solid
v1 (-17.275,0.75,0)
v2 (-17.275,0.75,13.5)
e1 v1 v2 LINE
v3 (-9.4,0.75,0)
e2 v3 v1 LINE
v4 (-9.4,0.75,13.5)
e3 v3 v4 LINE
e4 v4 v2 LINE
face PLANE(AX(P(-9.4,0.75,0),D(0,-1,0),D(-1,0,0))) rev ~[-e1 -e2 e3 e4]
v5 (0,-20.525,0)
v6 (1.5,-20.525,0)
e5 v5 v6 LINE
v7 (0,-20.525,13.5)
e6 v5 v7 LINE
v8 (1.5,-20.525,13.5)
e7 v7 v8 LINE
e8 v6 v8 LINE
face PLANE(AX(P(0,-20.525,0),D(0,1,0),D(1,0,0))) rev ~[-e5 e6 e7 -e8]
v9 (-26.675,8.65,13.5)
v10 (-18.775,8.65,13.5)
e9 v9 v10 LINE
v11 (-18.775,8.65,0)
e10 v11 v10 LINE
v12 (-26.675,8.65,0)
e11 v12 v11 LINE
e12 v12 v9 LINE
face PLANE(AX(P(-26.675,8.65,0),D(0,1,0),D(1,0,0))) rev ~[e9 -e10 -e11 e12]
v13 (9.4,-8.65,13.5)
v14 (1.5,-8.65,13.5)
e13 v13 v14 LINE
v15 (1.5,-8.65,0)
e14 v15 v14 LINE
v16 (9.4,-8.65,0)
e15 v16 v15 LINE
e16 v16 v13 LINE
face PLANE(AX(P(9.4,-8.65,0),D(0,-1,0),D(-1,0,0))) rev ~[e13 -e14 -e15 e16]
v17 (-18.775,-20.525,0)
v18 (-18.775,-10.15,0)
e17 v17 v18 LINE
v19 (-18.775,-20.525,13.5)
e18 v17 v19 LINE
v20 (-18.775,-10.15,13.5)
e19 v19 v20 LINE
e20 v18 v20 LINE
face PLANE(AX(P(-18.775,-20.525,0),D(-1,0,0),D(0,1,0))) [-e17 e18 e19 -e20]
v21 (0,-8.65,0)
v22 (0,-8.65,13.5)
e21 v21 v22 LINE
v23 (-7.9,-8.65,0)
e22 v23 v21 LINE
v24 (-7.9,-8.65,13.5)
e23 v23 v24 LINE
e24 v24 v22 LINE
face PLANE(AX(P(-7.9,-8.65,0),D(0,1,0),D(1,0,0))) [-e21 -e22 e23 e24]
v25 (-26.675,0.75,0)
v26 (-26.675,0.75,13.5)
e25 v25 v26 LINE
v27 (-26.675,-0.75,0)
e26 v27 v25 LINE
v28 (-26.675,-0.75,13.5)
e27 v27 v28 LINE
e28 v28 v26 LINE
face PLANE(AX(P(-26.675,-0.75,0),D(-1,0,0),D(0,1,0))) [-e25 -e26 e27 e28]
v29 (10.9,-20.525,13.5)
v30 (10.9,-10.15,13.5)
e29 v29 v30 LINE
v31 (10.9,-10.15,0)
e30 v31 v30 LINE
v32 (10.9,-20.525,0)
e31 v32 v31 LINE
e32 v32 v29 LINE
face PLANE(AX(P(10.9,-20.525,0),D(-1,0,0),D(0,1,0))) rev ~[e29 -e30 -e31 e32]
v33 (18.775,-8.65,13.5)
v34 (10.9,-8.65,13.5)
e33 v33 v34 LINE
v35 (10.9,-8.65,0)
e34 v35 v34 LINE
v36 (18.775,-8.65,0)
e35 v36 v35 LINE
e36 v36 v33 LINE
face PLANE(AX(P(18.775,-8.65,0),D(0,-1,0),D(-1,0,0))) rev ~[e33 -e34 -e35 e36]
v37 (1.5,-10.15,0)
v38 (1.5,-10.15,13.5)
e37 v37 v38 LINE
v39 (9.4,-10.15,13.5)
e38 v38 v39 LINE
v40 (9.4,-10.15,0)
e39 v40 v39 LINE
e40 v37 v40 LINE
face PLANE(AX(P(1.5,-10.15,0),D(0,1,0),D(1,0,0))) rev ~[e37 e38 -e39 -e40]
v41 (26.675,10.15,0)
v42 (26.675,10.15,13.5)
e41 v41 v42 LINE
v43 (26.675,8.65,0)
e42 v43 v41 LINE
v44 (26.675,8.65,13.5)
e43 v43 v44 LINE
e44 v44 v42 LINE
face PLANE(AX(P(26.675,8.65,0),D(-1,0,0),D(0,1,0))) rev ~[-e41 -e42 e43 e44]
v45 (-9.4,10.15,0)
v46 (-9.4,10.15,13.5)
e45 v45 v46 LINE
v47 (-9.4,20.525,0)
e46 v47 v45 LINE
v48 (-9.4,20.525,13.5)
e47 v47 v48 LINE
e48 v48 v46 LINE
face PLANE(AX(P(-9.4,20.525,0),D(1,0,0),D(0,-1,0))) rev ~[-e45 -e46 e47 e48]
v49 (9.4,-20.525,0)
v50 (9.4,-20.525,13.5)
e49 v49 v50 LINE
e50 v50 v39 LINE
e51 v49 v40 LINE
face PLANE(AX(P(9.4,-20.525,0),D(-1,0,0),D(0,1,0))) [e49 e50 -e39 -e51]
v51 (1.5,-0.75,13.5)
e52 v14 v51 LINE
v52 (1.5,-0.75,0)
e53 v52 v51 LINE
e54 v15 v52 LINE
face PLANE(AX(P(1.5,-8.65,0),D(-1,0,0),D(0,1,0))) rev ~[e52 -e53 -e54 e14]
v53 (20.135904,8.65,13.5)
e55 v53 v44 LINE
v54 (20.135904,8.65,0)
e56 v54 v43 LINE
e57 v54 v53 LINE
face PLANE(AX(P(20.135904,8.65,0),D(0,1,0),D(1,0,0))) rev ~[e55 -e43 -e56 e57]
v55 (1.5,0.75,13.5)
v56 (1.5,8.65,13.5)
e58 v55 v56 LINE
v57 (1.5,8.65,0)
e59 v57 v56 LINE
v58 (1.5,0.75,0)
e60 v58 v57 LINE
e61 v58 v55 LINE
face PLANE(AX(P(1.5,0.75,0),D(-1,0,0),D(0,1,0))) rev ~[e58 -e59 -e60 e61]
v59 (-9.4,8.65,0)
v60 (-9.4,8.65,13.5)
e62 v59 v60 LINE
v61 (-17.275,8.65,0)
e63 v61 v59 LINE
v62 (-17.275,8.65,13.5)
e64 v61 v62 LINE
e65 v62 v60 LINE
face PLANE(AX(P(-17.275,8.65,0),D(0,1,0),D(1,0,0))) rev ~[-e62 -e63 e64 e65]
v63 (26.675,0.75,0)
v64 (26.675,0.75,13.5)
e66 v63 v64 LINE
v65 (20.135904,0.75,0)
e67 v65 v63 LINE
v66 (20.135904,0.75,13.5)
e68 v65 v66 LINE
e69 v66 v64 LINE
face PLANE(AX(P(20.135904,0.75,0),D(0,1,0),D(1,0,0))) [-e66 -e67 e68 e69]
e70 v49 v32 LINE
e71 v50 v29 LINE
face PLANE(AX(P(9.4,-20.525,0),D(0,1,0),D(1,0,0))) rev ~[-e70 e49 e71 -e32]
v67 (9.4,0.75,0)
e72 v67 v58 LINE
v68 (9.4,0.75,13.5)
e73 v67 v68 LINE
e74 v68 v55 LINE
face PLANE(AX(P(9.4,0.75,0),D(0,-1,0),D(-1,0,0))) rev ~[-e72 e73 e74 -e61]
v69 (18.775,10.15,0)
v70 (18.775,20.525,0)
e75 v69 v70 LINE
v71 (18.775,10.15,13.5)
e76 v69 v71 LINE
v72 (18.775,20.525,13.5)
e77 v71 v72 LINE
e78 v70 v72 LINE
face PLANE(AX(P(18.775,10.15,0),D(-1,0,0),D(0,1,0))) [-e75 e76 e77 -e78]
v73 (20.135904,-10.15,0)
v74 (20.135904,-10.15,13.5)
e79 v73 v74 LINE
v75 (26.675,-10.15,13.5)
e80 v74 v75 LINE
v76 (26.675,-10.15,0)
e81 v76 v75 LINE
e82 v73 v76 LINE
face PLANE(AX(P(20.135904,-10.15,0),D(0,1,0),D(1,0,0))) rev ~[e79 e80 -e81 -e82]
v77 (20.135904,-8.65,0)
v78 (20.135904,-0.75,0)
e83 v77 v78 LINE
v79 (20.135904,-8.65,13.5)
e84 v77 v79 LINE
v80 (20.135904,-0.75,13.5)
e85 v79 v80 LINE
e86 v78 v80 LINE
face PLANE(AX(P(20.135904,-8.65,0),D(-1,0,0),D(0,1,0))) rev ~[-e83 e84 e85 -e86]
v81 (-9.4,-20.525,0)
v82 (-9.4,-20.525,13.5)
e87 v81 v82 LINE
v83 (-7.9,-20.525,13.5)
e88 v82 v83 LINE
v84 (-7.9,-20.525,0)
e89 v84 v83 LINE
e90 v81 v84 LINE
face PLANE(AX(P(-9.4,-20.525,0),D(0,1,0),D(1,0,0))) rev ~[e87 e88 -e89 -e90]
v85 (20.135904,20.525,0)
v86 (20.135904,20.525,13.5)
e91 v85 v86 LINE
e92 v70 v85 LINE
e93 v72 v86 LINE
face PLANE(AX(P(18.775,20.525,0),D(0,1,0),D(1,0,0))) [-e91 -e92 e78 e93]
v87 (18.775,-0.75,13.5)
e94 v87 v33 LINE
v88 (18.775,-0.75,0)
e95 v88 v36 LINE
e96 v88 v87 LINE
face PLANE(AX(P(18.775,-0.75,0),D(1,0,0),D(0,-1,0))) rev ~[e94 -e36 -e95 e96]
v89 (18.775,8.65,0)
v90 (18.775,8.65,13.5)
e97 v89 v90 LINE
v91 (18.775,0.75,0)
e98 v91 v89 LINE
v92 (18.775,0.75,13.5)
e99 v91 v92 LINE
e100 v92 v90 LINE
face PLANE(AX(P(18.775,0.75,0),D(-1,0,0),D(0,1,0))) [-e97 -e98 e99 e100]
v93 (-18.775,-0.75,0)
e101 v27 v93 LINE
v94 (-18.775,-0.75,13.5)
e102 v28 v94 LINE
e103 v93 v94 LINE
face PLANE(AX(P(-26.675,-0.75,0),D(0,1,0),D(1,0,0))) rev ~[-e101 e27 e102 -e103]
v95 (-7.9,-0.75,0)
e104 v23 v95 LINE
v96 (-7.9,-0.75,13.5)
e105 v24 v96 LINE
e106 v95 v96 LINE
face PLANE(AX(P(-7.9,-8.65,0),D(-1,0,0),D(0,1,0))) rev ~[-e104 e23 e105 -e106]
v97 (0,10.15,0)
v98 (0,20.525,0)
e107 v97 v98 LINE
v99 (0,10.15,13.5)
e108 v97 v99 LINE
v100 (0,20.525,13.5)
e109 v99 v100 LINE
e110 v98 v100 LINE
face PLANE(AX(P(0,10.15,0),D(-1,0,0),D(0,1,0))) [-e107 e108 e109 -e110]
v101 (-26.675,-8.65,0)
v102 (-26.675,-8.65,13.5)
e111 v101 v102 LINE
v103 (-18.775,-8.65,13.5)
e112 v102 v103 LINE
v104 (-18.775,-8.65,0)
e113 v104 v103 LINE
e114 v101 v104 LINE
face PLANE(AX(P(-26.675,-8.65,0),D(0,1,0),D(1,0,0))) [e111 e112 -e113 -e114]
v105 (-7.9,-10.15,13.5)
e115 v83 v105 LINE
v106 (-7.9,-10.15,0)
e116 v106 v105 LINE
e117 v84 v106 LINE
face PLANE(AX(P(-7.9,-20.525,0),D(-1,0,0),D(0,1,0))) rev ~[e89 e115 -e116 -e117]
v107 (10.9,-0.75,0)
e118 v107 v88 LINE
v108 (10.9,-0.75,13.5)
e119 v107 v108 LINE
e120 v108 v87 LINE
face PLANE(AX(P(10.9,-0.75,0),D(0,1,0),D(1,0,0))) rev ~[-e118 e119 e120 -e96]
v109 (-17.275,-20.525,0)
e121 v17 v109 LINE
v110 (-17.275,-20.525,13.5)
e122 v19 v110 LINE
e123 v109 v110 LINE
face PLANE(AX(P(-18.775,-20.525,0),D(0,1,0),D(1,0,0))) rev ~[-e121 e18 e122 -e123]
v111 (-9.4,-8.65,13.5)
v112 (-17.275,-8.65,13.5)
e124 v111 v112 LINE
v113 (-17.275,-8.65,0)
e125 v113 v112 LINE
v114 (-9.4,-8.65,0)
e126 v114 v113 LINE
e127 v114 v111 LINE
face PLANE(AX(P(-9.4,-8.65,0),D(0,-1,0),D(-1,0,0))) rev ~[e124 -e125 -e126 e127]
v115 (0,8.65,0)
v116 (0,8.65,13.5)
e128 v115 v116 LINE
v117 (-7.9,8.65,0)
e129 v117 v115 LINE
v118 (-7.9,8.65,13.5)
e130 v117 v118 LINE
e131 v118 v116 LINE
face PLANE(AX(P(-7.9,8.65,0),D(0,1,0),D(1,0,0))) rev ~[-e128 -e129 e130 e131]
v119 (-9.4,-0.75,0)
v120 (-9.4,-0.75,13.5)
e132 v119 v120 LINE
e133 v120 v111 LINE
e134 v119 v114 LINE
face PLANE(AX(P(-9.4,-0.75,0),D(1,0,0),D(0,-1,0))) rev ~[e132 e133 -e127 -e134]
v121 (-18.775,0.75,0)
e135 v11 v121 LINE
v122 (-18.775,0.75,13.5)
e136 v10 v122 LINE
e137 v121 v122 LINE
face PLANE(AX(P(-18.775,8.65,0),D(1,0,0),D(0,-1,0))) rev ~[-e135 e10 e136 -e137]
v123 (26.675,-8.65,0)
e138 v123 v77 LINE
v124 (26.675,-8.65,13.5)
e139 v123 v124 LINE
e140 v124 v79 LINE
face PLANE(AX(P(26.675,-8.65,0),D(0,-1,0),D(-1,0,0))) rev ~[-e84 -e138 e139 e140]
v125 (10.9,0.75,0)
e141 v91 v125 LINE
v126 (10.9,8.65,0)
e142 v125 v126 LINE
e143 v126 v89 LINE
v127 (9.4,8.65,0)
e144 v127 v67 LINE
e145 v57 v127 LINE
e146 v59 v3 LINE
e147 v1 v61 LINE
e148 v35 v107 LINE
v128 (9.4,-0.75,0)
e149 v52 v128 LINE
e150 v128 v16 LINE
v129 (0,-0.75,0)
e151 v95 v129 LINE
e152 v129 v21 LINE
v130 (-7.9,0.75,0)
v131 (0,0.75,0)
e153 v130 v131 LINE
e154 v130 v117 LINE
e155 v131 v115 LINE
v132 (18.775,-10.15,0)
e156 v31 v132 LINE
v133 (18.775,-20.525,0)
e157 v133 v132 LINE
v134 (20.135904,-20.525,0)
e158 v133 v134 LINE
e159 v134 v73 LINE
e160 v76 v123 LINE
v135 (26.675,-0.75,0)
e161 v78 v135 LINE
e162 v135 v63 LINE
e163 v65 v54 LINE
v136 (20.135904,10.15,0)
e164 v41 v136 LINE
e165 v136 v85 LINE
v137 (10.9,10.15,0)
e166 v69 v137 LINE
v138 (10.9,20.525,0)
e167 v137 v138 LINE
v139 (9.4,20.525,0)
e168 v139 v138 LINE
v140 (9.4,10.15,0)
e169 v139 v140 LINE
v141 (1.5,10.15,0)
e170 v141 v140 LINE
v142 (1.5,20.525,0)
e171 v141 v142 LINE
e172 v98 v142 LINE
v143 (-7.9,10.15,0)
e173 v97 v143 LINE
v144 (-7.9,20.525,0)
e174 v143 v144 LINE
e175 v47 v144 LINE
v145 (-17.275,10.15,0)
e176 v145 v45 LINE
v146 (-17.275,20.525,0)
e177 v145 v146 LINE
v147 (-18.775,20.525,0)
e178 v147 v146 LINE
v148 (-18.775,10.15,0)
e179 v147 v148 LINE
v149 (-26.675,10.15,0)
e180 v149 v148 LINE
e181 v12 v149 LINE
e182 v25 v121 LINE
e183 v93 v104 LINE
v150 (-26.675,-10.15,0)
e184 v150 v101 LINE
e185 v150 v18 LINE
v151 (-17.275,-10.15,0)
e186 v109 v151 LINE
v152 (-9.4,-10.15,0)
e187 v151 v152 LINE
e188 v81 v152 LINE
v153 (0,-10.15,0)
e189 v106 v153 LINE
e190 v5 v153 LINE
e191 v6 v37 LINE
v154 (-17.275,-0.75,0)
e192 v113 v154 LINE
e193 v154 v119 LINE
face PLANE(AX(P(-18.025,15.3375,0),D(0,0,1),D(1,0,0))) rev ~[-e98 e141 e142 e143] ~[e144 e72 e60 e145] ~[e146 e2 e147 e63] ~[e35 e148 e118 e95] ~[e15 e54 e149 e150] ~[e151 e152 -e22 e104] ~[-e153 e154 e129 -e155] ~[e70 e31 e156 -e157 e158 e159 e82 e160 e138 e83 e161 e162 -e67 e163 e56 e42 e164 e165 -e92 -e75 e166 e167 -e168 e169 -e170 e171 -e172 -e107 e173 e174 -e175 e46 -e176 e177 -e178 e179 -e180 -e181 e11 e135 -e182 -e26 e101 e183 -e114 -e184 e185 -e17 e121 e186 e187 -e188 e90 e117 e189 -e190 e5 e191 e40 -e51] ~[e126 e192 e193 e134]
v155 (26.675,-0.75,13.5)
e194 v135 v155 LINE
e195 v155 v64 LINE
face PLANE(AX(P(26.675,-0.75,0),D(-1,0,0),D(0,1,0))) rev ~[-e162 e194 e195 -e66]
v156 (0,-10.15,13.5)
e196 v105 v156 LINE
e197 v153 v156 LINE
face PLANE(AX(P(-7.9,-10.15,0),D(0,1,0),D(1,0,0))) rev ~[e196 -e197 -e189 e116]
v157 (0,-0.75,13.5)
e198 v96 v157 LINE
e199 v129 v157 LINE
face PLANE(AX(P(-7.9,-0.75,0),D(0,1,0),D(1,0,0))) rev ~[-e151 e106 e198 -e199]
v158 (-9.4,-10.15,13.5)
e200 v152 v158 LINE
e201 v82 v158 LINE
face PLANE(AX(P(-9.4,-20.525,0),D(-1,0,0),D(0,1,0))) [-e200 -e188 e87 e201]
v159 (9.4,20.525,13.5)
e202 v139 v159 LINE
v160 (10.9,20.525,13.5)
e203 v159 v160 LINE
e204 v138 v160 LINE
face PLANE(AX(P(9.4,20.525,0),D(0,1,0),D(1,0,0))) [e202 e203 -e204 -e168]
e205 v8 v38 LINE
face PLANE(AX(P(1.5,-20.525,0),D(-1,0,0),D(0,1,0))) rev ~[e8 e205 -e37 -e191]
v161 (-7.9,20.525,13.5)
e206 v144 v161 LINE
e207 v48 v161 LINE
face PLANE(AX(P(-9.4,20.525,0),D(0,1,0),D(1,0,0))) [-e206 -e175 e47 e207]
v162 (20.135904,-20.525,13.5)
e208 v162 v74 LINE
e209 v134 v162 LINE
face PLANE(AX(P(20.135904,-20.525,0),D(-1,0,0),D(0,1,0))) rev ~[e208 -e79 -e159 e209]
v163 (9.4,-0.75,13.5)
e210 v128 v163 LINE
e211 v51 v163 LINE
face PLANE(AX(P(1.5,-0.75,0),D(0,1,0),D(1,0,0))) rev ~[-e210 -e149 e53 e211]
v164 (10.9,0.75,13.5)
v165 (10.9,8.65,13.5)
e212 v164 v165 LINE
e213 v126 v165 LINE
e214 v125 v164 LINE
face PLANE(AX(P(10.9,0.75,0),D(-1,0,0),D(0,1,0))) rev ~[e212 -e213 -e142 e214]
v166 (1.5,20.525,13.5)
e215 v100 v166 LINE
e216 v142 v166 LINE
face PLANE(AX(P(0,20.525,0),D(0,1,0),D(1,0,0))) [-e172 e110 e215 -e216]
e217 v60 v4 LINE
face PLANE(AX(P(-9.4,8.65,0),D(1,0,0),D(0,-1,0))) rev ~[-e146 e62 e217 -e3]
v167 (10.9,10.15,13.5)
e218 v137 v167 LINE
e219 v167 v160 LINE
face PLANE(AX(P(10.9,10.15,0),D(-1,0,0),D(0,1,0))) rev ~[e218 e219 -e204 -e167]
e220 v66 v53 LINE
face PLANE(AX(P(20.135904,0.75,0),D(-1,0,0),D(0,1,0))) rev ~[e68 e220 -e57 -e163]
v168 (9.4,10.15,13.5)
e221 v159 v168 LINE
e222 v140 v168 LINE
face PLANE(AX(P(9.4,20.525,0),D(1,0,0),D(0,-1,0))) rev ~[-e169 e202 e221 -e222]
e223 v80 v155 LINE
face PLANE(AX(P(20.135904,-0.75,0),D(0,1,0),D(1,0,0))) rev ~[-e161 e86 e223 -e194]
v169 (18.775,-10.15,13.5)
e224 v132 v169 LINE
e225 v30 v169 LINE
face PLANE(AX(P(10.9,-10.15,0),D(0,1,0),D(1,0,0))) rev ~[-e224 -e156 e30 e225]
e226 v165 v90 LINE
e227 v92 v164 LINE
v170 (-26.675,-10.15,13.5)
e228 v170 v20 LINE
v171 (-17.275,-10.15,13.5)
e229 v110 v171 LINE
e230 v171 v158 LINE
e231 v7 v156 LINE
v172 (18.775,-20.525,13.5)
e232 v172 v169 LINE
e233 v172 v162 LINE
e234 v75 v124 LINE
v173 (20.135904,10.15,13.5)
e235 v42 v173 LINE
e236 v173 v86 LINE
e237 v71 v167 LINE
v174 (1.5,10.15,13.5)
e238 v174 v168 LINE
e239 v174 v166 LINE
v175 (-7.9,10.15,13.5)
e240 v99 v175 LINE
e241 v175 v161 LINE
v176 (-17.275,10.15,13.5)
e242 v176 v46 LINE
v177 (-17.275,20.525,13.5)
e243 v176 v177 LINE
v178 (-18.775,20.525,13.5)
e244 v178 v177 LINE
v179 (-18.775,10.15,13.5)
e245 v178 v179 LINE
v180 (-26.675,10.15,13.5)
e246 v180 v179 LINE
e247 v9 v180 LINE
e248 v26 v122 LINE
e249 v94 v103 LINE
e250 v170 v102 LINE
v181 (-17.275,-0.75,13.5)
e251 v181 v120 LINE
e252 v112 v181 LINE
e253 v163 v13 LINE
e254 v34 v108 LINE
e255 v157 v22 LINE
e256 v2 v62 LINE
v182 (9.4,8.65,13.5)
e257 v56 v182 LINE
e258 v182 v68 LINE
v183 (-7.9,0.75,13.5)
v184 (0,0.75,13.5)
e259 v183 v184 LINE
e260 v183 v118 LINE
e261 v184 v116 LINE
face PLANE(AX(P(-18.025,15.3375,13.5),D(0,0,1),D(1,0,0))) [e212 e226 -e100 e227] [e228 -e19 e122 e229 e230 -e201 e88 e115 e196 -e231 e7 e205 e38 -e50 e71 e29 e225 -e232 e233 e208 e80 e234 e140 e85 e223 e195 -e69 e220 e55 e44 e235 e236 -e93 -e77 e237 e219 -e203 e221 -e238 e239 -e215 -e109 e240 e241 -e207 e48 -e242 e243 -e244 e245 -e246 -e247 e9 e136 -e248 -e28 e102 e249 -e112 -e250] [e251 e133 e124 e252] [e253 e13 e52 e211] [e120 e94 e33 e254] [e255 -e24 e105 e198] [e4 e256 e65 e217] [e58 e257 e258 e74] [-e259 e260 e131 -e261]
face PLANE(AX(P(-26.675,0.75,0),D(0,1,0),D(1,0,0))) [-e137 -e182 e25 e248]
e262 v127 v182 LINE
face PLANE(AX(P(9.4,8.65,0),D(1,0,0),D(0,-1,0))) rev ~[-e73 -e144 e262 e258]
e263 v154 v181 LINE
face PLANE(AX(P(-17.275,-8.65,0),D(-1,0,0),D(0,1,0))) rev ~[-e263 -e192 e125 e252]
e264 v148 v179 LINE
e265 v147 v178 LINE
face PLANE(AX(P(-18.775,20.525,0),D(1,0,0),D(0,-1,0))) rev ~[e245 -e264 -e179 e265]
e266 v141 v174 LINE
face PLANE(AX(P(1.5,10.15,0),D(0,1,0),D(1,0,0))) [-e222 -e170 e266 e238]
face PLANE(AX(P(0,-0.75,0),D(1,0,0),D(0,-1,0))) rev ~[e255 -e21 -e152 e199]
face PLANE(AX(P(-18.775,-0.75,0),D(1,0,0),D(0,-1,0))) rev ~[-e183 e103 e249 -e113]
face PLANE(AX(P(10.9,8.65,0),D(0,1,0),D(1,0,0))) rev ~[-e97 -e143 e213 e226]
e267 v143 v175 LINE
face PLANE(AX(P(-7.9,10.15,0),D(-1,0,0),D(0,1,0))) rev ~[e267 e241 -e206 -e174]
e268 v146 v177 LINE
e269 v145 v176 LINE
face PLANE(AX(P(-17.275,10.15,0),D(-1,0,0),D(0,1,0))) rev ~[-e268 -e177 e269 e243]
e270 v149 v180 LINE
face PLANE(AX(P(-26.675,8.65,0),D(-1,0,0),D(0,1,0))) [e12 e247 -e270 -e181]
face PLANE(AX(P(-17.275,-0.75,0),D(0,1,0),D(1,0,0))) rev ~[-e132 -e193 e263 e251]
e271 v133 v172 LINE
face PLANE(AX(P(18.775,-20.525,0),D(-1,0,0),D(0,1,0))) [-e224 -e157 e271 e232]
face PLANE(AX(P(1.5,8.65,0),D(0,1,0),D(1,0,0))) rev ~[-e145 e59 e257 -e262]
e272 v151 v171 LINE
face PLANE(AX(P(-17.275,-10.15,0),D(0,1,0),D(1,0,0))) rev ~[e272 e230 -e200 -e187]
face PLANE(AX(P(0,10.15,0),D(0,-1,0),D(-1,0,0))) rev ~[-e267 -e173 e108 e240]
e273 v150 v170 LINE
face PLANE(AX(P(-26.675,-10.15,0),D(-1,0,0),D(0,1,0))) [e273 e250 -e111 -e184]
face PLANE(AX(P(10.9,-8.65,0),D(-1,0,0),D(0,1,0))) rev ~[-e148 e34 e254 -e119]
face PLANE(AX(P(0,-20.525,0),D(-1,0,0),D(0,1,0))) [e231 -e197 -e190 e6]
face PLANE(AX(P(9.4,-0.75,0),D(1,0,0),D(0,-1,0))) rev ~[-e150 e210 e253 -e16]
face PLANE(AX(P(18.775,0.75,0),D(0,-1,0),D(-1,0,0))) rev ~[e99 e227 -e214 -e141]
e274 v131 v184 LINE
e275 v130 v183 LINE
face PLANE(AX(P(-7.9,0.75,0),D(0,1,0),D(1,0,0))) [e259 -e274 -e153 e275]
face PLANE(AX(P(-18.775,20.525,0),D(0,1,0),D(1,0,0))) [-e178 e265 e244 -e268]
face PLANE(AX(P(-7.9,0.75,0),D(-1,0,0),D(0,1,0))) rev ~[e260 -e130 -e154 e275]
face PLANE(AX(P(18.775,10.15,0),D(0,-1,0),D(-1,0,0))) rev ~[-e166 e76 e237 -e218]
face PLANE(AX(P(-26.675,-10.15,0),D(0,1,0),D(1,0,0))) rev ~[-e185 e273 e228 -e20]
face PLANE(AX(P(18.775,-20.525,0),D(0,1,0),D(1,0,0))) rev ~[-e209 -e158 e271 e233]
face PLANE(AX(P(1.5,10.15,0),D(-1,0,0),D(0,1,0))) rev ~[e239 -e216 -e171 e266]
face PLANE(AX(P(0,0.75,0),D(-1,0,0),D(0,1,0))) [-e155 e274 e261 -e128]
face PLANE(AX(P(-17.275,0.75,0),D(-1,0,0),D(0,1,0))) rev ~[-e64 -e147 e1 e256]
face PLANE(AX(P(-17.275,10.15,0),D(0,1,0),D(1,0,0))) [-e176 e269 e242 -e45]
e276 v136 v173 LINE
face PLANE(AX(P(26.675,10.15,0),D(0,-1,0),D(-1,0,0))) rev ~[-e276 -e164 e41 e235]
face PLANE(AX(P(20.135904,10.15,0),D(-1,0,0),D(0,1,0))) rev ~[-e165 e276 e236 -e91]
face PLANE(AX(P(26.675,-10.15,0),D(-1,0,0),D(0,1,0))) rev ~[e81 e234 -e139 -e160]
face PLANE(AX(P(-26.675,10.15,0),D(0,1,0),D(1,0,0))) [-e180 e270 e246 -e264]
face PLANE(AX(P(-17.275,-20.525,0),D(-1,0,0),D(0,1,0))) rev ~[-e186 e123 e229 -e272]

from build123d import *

# Parameters (mm, degrees)
F0_W     = 1.5
F0_H     = 10.375
F0_H_2   = 1.5
F0_W_2   = 7.9
F0_H_3   = 7.9
F0_W_3   = 7.875
F0_W_4   = 1.360903731
F0_W_5   = 6.539096269
F1_DEPTH = 13.5


with BuildPart() as f1:
    # F0 (on Top) → F1 (new body)
    with BuildSketch(Plane.XY):
        with Locations((-18.025, 15.3375)):
            Rectangle(F0_W, F0_H)
        with Locations((-18.025, 9.4)):
            Rectangle(F0_W, F0_H_2)
        with Locations((-22.725, 9.4)):
            Rectangle(F0_W_2, F0_H_2)
        with Locations((-18.025, 4.7)):
            Rectangle(F0_W, F0_H_3)
        with Locations((-18.025, 0)):
            Rectangle(F0_W, F0_H_2)
        with Locations((-22.725, 0)):
            Rectangle(F0_W_2, F0_H_2)
        with Locations((-18.025, -4.7)):
            Rectangle(F0_W, F0_H_3)
        with Locations((-18.025, -9.4)):
            Rectangle(F0_W, F0_H_2)
        with Locations((-22.725, -9.4)):
            Rectangle(F0_W_2, F0_H_2)
        with Locations((-18.025, -15.3375)):
            Rectangle(F0_W, F0_H)
        with Locations((-13.3375, -9.4)):
            Rectangle(F0_W_3, F0_H_2)
        with Locations((-8.65, -9.4)):
            Rectangle(F0_W, F0_H_2)
        with Locations((-8.65, -4.7)):
            Rectangle(F0_W, F0_H_3)
        with Locations((-8.65, 0)):
            Rectangle(F0_W, F0_H_2)
        with Locations((-13.3375, 0)):
            Rectangle(F0_W_3, F0_H_2)
        with Locations((-8.65, -15.3375)):
            Rectangle(F0_W, F0_H)
        with Locations((-8.65, 15.3375)):
            Rectangle(F0_W, F0_H)
        with Locations((-8.65, 9.4)):
            Rectangle(F0_W, F0_H_2)
        with Locations((-8.65, 4.7)):
            Rectangle(F0_W, F0_H_3)
        with Locations((-13.3375, 9.4)):
            Rectangle(F0_W_3, F0_H_2)
        with Locations((-3.95, 9.4)):
            Rectangle(F0_W_2, F0_H_2)
        with Locations((0.75, 9.4)):
            Rectangle(F0_W, F0_H_2)
        with Locations((0.75, 15.3375)):
            Rectangle(F0_W, F0_H)
        with Locations((0.75, 4.7)):
            Rectangle(F0_W, F0_H_3)
        with Locations((-3.95, 0)):
            Rectangle(F0_W_2, F0_H_2)
        with Locations((0.75, 0)):
            Rectangle(F0_W, F0_H_2)
        with Locations((0.75, -4.7)):
            Rectangle(F0_W, F0_H_3)
        with Locations((0.75, -9.4)):
            Rectangle(F0_W, F0_H_2)
        with Locations((-3.95, -9.4)):
            Rectangle(F0_W_2, F0_H_2)
        with Locations((0.75, -15.3375)):
            Rectangle(F0_W, F0_H)
        with Locations((5.45, -9.4)):
            Rectangle(F0_W_2, F0_H_2)
        with Locations((10.15, -15.3375)):
            Rectangle(F0_W, F0_H)
        with Locations((19.4554518655, -15.3375)):
            Rectangle(F0_W_4, F0_H)
        with Locations((23.4054518655, -9.4)):
            Rectangle(F0_W_5, F0_H_2)
        with Locations((14.8375, -9.4)):
            Rectangle(F0_W_3, F0_H_2)
        with Locations((19.4554518655, -9.4)):
            Rectangle(F0_W_4, F0_H_2)
        with Locations((10.15, -9.4)):
            Rectangle(F0_W, F0_H_2)
        with Locations((10.15, -4.7)):
            Rectangle(F0_W, F0_H_3)
        with Locations((19.4554518655, -4.7)):
            Rectangle(F0_W_4, F0_H_3)
        with Locations((19.4554518655, 0)):
            Rectangle(F0_W_4, F0_H_2)
        with Locations((14.8375, 0)):
            Rectangle(F0_W_3, F0_H_2)
        with Locations((10.15, 0)):
            Rectangle(F0_W, F0_H_2)
        with Locations((5.45, 0)):
            Rectangle(F0_W_2, F0_H_2)
        with Locations((19.4554518655, 4.7)):
            Rectangle(F0_W_4, F0_H_3)
        with Locations((10.15, 4.7)):
            Rectangle(F0_W, F0_H_3)
        with Locations((23.4054518655, 0)):
            Rectangle(F0_W_5, F0_H_2)
        with Locations((23.4054518655, 9.4)):
            Rectangle(F0_W_5, F0_H_2)
        with Locations((14.8375, 9.4)):
            Rectangle(F0_W_3, F0_H_2)
        with Locations((19.4554518655, 9.4)):
            Rectangle(F0_W_4, F0_H_2)
        with Locations((19.4554518655, 15.3375)):
            Rectangle(F0_W_4, F0_H)
        with Locations((10.15, 15.3375)):
            Rectangle(F0_W, F0_H)
        with Locations((10.15, 9.4)):
            Rectangle(F0_W, F0_H_2)
        with Locations((5.45, 9.4)):
            Rectangle(F0_W_2, F0_H_2)
    extrude(amount=F1_DEPTH)


solid = f1.part
